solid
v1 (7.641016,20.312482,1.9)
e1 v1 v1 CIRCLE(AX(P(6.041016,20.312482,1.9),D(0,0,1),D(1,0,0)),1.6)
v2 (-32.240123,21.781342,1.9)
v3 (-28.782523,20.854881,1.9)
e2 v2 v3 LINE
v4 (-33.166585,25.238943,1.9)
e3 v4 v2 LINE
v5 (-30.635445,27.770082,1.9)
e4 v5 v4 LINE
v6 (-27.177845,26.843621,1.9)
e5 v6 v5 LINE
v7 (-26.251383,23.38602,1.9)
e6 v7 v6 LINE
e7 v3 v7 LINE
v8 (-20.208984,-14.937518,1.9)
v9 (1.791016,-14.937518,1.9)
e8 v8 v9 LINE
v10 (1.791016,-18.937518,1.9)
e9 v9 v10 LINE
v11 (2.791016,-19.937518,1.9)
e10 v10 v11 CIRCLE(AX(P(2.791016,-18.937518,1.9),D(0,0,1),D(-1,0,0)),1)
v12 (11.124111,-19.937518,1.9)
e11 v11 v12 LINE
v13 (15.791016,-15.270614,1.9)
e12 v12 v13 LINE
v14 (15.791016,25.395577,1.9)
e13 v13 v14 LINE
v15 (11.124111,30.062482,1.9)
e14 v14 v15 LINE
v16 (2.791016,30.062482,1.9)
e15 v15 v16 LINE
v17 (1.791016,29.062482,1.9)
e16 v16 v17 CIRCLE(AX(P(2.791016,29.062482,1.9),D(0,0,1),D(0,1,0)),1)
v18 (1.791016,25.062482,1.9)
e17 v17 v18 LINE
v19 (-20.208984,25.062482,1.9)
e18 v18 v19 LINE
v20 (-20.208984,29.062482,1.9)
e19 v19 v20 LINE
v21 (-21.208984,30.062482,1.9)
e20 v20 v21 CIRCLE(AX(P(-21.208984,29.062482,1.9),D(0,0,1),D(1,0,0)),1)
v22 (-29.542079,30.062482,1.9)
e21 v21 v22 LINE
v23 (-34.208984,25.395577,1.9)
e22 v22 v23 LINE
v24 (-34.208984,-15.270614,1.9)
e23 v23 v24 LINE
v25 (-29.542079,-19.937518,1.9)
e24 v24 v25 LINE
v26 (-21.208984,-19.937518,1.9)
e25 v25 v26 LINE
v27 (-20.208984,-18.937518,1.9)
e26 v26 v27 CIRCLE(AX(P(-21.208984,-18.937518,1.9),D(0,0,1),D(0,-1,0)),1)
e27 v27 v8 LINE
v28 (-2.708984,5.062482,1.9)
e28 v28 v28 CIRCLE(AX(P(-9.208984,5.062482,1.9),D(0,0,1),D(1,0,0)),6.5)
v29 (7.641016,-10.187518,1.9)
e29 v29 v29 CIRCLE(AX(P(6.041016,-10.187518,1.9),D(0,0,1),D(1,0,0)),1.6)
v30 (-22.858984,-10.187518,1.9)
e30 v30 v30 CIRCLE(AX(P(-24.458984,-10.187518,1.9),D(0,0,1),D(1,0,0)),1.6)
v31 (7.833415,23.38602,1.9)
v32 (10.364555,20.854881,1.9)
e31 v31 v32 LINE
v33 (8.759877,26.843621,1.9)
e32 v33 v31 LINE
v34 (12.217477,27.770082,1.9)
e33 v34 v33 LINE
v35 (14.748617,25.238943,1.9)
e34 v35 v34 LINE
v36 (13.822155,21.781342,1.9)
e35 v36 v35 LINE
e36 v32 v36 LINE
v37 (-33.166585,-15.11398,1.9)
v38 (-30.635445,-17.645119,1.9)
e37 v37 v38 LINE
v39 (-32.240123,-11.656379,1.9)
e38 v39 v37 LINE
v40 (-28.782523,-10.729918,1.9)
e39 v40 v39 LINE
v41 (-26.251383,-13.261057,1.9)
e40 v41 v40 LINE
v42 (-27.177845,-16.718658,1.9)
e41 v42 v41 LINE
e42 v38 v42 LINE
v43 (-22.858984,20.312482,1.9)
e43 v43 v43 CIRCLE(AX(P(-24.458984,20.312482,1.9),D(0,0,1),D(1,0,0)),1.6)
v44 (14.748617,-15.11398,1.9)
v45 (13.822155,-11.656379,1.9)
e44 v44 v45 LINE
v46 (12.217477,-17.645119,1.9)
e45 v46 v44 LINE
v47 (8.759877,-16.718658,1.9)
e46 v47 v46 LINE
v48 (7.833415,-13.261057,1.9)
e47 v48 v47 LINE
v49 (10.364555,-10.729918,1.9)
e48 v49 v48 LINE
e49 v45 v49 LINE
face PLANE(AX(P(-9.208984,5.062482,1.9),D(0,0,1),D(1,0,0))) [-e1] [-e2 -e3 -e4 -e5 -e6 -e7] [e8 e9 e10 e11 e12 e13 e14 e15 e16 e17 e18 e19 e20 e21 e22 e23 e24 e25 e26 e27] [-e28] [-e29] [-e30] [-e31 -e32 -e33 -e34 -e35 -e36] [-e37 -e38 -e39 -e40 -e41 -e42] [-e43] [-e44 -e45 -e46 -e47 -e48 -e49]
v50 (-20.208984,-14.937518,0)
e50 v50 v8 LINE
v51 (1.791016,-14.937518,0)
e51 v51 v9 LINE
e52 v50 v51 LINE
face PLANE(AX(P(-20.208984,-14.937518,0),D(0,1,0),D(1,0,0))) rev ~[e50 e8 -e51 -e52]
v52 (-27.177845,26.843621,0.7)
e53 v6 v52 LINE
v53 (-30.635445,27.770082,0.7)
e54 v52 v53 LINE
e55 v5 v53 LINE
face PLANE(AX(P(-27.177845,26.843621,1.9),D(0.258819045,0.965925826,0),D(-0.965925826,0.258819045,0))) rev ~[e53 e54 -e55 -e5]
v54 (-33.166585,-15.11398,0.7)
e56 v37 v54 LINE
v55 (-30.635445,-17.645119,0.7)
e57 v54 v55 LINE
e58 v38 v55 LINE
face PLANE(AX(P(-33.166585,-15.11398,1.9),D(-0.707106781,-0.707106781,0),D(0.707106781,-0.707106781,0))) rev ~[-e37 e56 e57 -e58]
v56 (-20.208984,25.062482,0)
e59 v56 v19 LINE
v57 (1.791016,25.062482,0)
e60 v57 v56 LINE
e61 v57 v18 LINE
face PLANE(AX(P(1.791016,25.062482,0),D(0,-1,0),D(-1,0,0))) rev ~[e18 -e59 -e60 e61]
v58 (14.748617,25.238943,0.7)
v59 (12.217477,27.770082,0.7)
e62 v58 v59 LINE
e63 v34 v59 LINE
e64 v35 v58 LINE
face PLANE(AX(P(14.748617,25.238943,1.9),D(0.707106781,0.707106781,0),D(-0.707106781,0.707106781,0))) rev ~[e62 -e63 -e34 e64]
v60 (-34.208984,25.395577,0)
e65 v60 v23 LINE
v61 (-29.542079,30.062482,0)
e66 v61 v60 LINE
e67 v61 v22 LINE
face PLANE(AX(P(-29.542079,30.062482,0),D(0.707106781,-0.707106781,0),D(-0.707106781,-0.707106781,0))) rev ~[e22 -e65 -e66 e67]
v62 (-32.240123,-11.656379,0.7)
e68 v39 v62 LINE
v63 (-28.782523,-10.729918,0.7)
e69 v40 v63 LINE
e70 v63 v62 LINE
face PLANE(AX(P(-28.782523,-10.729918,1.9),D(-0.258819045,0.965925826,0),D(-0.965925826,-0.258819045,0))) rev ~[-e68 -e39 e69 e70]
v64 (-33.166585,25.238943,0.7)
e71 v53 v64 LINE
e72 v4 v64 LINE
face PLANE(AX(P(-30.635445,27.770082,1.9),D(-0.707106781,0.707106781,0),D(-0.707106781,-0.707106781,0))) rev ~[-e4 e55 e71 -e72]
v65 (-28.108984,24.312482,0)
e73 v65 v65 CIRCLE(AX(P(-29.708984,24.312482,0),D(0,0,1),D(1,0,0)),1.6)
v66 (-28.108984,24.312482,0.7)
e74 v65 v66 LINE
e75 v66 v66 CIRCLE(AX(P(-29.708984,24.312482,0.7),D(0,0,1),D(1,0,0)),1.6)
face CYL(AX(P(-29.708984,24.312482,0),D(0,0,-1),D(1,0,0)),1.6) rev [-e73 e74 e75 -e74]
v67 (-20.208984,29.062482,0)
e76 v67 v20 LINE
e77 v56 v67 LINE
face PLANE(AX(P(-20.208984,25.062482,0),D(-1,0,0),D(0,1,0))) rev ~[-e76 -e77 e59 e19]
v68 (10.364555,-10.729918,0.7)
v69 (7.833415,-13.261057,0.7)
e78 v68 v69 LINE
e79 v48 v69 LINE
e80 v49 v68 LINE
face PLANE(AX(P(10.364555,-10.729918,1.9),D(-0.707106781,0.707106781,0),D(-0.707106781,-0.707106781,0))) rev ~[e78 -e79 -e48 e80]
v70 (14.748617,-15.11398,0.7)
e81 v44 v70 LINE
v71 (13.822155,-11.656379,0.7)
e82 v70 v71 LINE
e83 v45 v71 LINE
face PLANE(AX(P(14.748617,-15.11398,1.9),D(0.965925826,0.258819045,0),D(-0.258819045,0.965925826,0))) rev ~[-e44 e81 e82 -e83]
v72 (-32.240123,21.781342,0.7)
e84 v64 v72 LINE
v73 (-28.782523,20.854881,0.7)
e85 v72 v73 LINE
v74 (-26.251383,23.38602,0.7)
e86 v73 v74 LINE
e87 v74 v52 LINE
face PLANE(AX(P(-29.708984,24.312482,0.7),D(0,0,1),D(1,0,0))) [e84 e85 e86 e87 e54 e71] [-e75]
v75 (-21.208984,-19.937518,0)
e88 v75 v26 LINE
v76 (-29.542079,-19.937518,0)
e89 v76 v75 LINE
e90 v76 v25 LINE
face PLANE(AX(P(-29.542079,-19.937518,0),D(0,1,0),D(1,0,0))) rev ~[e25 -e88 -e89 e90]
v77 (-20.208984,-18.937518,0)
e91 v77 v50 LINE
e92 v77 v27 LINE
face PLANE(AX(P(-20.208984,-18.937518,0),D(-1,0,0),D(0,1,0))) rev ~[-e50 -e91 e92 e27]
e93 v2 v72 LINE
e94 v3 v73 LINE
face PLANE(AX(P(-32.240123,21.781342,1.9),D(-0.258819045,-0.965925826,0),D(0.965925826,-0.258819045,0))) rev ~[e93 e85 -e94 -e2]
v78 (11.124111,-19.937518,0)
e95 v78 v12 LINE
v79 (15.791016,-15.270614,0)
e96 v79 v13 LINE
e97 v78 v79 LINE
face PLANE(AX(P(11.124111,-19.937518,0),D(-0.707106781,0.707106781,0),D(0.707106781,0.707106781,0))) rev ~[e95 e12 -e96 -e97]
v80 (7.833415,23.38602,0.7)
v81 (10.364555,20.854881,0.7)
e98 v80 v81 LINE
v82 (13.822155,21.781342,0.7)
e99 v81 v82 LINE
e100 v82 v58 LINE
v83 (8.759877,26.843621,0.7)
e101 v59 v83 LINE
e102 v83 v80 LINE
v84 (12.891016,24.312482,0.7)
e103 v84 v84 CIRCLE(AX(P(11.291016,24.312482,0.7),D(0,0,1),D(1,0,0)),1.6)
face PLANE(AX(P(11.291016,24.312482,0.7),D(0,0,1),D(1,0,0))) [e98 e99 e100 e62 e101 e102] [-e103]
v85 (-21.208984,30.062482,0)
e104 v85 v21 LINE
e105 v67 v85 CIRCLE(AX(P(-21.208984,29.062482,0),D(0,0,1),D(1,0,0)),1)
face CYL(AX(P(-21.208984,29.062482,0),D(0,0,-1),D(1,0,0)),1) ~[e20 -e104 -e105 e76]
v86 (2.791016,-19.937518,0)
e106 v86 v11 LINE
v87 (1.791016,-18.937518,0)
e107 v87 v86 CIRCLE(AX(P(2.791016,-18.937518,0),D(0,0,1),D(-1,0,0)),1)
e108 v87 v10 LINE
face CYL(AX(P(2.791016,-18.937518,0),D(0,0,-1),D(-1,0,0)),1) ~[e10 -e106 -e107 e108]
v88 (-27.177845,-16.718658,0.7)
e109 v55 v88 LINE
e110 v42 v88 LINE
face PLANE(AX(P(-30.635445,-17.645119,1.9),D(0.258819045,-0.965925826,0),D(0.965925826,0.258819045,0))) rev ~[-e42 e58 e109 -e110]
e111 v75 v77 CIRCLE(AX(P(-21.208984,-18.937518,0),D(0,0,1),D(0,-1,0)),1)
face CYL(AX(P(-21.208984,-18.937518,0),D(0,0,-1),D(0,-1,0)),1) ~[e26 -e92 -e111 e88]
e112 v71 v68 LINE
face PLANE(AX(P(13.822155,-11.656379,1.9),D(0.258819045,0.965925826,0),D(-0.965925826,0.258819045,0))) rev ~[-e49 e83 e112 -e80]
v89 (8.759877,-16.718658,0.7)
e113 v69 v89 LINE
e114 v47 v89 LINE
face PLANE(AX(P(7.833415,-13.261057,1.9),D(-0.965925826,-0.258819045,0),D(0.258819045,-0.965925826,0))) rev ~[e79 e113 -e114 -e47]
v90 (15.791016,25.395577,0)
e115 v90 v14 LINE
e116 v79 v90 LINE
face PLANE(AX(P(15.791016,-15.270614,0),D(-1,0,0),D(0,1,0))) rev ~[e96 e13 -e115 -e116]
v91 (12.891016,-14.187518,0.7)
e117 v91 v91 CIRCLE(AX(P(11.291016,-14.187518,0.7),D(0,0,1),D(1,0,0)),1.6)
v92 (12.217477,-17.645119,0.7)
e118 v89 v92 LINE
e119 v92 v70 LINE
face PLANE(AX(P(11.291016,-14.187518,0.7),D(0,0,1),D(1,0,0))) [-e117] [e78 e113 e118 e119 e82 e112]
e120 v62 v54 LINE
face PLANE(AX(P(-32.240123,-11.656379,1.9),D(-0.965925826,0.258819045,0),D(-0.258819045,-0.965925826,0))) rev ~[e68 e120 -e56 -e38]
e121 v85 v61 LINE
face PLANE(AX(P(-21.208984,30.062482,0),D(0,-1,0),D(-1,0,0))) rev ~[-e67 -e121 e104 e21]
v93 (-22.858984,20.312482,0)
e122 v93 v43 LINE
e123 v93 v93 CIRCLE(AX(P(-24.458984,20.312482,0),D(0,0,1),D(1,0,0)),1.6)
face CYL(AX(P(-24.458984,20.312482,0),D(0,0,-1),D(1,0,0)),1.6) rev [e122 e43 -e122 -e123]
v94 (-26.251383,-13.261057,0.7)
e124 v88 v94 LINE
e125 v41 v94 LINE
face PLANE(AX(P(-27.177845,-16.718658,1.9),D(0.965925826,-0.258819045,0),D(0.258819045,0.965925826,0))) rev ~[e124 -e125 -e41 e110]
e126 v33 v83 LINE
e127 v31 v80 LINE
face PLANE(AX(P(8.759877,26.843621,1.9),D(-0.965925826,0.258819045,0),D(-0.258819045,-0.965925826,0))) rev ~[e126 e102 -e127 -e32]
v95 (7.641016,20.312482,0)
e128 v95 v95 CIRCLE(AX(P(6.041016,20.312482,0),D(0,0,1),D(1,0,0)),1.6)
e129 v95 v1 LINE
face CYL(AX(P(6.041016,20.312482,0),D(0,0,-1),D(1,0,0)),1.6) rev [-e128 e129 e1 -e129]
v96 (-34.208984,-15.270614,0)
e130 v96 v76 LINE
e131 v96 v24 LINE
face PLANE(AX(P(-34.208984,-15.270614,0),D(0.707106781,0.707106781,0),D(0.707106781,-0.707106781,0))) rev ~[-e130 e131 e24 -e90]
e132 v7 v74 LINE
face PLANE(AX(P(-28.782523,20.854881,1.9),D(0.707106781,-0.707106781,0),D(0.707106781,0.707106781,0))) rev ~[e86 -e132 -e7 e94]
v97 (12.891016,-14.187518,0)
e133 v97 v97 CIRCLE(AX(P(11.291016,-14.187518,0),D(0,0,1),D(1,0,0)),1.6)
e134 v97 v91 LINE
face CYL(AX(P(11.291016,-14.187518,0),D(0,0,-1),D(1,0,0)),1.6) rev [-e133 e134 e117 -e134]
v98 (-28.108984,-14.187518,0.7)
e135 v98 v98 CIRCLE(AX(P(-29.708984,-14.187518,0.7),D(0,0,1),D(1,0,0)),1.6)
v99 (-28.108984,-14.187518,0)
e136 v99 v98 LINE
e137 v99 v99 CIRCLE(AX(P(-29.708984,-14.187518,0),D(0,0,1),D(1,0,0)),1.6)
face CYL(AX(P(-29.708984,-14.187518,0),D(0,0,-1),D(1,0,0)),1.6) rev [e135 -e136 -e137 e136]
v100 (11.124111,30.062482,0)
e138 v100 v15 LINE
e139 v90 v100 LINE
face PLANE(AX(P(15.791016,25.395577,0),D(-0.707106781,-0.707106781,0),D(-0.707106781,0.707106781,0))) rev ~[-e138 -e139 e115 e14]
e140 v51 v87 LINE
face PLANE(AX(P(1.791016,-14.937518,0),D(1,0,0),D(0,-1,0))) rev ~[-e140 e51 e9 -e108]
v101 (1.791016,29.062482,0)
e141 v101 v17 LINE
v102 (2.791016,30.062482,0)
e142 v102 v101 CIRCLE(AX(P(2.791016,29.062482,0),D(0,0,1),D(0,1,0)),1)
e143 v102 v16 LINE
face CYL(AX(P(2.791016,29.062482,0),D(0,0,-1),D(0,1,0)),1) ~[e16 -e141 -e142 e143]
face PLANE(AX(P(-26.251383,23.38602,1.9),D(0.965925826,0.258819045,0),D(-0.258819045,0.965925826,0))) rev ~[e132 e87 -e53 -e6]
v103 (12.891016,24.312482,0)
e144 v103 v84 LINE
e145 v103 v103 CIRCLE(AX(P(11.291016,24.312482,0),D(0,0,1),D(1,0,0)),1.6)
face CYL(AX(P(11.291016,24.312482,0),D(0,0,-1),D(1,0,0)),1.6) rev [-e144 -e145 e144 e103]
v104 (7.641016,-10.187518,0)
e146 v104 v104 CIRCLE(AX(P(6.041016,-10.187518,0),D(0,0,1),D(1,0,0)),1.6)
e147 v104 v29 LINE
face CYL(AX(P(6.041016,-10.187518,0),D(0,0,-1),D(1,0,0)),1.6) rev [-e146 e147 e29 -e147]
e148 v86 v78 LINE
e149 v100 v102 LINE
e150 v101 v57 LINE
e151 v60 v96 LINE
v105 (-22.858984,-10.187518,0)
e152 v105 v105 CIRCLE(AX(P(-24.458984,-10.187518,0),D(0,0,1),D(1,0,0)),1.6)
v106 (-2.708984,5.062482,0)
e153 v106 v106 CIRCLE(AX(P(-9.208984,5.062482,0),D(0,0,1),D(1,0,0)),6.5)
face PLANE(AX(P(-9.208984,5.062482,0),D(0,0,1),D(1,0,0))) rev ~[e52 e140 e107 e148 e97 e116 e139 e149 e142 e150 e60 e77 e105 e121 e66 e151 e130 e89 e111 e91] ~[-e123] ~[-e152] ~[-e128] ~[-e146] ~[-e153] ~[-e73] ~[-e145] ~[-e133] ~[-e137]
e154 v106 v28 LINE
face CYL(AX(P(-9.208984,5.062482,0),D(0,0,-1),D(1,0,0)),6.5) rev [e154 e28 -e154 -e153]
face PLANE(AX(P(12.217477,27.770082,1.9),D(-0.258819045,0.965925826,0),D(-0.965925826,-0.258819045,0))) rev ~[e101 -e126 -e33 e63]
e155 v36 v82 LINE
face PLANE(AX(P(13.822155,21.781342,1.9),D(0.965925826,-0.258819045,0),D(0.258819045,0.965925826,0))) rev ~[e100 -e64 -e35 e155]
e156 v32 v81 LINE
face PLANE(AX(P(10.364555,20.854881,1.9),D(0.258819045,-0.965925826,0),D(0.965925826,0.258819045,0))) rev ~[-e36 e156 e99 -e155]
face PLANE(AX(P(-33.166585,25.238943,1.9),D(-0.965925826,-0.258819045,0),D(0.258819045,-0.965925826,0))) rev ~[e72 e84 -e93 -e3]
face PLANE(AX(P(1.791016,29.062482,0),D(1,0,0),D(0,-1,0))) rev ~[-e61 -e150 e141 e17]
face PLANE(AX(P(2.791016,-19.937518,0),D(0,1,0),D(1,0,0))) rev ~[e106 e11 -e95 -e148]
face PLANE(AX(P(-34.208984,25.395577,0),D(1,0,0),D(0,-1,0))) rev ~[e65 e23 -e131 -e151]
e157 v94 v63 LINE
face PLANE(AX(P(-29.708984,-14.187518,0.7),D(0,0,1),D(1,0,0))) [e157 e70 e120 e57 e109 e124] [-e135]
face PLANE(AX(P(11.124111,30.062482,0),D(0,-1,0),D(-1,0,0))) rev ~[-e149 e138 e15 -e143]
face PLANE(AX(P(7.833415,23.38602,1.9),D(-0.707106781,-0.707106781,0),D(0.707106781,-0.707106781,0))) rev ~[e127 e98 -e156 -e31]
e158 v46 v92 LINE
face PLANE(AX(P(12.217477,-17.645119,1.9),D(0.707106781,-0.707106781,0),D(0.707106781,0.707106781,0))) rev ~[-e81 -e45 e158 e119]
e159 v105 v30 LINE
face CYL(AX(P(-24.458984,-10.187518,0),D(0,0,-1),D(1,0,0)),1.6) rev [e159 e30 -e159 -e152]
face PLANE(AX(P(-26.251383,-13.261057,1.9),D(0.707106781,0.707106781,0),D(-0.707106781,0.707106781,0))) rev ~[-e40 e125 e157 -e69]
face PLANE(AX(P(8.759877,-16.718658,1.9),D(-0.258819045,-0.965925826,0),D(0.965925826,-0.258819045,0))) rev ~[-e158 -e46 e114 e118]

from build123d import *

# Parameters (mm, degrees)
F0_R     = 1.6
F0_R_2   = 6.5
F1_DEPTH = 1.9
F2_R     = 1.6
F3_DEPTH = 1.2


# Not quite as in the source:
# - a feature names something its author has since deleted; it is built from what else it names


with BuildPart() as f1:
    # F0 (on Top) → F1 (new body)
    with BuildSketch(Plane.XY):
        with BuildLine():
            Line((15.7910159975, 25.3955767816), (11.1241112417, 30.0624815375))
            Line((11.1241112417, 30.0624815375), (2.7910159975, 30.0624815375))
            ThreePointArc((2.7910159975, 30.0624815375), (2.0839092163, 29.7695883186), (1.7910159975, 29.0624815375))
            Line((1.7910159975, 29.0624815375), (1.7910159975, 25.0624815375))
            Line((1.7910159975, 25.0624815375), (-20.2089840025, 25.0624815375))
            Line((-20.2089840025, 25.0624815375), (-20.2089840025, 29.0624815375))
            ThreePointArc((-20.2089840025, 29.0624815375), (-20.5018772213, 29.7695883186), (-21.2089840025, 30.0624815375))
            Line((-21.2089840025, 30.0624815375), (-29.5420792466, 30.0624815375))
            Line((-29.5420792466, 30.0624815375), (-34.2089840025, 25.3955767816))
            Line((-34.2089840025, 25.3955767816), (-34.2089840025, -15.2706137067))
            Line((-34.2089840025, -15.2706137067), (-29.5420792466, -19.9375184625))
            Line((-29.5420792466, -19.9375184625), (-21.2089840025, -19.9375184625))
            ThreePointArc((-21.2089840025, -19.9375184625), (-20.5018772213, -19.6446252437), (-20.2089840025, -18.9375184625))
            Line((-20.2089840025, -18.9375184625), (-20.2089840025, -14.9375184625))
            Line((-20.2089840025, -14.9375184625), (1.7910159975, -14.9375184625))
            Line((1.7910159975, -14.9375184625), (1.7910159975, -18.9375184625))
            ThreePointArc((1.7910159975, -18.9375184625), (2.0839092163, -19.6446252437), (2.7910159975, -19.9375184625))
            Line((2.7910159975, -19.9375184625), (11.1241112417, -19.9375184625))
            Line((11.1241112417, -19.9375184625), (15.7910159975, -15.2706137067))
            Line((15.7910159975, -15.2706137067), (15.7910159975, 25.3955767816))
        make_face()
        with Locations((-29.7089840025, -14.1875184625)):
            Circle(F0_R, mode=Mode.SUBTRACT)
        with Locations((-24.4589840025, -10.1875184625)):
            Circle(F0_R, mode=Mode.SUBTRACT)
        with Locations((11.2910159975, -14.1875184625)):
            Circle(F0_R, mode=Mode.SUBTRACT)
        with Locations((6.0410159975, -10.1875184625)):
            Circle(F0_R, mode=Mode.SUBTRACT)
        with Locations((-24.4589840025, 20.3124815375)):
            Circle(F0_R, mode=Mode.SUBTRACT)
        with Locations((-29.7089840025, 24.3124815375)):
            Circle(F0_R, mode=Mode.SUBTRACT)
        with Locations((-9.2089840025, 5.0624815375)):
            Circle(F0_R_2, mode=Mode.SUBTRACT)
        with Locations((6.0410159975, 20.3124815375)):
            Circle(F0_R, mode=Mode.SUBTRACT)
        with Locations((11.2910159975, 24.3124815375)):
            Circle(F0_R, mode=Mode.SUBTRACT)
    extrude(amount=F1_DEPTH)

    # F2 (on face) → F3 (cut)
    with BuildSketch(Plane.XY.offset(1.9)):
        Polygon((-30.6354453237, 27.7700822596), (-33.1665847246, 25.2389428587), (-32.2401234033, 21.7813421366), (-28.7825226812, 20.8548808153), (-26.2513832804, 23.3860202162), (-27.1778446016, 26.8436209383), align=None)
        with Locations((-29.7089840025, 24.3124815375)):
            Circle(F2_R, mode=Mode.SUBTRACT)
        Polygon((14.7486167196, 25.2389428587), (12.2174773188, 27.7700822596), (8.7598765967, 26.8436209383), (7.8334152754, 23.3860202162), (10.3645546763, 20.8548808153), (13.8221553984, 21.7813421366), align=None)
        with Locations((11.2910159975, 24.3124815375)):
            Circle(F2_R, mode=Mode.SUBTRACT)
        Polygon((12.2174773188, -17.6451191847), (14.7486167196, -15.1139797838), (13.8221553984, -11.6563790617), (10.3645546763, -10.7299177404), (7.8334152754, -13.2610571413), (8.7598765967, -16.7186578634), align=None)
        with Locations((11.2910159975, -14.1875184625)):
            Circle(F2_R, mode=Mode.SUBTRACT)
        Polygon((-33.1665847246, -15.1139797838), (-30.6354453237, -17.6451191847), (-27.1778446016, -16.7186578634), (-26.2513832804, -13.2610571413), (-28.7825226812, -10.7299177404), (-32.2401234033, -11.6563790617), align=None)
        with Locations((-29.7089840025, -14.1875184625)):
            Circle(F2_R, mode=Mode.SUBTRACT)
    extrude(amount=-F3_DEPTH, mode=Mode.SUBTRACT)


solid = f1.part
